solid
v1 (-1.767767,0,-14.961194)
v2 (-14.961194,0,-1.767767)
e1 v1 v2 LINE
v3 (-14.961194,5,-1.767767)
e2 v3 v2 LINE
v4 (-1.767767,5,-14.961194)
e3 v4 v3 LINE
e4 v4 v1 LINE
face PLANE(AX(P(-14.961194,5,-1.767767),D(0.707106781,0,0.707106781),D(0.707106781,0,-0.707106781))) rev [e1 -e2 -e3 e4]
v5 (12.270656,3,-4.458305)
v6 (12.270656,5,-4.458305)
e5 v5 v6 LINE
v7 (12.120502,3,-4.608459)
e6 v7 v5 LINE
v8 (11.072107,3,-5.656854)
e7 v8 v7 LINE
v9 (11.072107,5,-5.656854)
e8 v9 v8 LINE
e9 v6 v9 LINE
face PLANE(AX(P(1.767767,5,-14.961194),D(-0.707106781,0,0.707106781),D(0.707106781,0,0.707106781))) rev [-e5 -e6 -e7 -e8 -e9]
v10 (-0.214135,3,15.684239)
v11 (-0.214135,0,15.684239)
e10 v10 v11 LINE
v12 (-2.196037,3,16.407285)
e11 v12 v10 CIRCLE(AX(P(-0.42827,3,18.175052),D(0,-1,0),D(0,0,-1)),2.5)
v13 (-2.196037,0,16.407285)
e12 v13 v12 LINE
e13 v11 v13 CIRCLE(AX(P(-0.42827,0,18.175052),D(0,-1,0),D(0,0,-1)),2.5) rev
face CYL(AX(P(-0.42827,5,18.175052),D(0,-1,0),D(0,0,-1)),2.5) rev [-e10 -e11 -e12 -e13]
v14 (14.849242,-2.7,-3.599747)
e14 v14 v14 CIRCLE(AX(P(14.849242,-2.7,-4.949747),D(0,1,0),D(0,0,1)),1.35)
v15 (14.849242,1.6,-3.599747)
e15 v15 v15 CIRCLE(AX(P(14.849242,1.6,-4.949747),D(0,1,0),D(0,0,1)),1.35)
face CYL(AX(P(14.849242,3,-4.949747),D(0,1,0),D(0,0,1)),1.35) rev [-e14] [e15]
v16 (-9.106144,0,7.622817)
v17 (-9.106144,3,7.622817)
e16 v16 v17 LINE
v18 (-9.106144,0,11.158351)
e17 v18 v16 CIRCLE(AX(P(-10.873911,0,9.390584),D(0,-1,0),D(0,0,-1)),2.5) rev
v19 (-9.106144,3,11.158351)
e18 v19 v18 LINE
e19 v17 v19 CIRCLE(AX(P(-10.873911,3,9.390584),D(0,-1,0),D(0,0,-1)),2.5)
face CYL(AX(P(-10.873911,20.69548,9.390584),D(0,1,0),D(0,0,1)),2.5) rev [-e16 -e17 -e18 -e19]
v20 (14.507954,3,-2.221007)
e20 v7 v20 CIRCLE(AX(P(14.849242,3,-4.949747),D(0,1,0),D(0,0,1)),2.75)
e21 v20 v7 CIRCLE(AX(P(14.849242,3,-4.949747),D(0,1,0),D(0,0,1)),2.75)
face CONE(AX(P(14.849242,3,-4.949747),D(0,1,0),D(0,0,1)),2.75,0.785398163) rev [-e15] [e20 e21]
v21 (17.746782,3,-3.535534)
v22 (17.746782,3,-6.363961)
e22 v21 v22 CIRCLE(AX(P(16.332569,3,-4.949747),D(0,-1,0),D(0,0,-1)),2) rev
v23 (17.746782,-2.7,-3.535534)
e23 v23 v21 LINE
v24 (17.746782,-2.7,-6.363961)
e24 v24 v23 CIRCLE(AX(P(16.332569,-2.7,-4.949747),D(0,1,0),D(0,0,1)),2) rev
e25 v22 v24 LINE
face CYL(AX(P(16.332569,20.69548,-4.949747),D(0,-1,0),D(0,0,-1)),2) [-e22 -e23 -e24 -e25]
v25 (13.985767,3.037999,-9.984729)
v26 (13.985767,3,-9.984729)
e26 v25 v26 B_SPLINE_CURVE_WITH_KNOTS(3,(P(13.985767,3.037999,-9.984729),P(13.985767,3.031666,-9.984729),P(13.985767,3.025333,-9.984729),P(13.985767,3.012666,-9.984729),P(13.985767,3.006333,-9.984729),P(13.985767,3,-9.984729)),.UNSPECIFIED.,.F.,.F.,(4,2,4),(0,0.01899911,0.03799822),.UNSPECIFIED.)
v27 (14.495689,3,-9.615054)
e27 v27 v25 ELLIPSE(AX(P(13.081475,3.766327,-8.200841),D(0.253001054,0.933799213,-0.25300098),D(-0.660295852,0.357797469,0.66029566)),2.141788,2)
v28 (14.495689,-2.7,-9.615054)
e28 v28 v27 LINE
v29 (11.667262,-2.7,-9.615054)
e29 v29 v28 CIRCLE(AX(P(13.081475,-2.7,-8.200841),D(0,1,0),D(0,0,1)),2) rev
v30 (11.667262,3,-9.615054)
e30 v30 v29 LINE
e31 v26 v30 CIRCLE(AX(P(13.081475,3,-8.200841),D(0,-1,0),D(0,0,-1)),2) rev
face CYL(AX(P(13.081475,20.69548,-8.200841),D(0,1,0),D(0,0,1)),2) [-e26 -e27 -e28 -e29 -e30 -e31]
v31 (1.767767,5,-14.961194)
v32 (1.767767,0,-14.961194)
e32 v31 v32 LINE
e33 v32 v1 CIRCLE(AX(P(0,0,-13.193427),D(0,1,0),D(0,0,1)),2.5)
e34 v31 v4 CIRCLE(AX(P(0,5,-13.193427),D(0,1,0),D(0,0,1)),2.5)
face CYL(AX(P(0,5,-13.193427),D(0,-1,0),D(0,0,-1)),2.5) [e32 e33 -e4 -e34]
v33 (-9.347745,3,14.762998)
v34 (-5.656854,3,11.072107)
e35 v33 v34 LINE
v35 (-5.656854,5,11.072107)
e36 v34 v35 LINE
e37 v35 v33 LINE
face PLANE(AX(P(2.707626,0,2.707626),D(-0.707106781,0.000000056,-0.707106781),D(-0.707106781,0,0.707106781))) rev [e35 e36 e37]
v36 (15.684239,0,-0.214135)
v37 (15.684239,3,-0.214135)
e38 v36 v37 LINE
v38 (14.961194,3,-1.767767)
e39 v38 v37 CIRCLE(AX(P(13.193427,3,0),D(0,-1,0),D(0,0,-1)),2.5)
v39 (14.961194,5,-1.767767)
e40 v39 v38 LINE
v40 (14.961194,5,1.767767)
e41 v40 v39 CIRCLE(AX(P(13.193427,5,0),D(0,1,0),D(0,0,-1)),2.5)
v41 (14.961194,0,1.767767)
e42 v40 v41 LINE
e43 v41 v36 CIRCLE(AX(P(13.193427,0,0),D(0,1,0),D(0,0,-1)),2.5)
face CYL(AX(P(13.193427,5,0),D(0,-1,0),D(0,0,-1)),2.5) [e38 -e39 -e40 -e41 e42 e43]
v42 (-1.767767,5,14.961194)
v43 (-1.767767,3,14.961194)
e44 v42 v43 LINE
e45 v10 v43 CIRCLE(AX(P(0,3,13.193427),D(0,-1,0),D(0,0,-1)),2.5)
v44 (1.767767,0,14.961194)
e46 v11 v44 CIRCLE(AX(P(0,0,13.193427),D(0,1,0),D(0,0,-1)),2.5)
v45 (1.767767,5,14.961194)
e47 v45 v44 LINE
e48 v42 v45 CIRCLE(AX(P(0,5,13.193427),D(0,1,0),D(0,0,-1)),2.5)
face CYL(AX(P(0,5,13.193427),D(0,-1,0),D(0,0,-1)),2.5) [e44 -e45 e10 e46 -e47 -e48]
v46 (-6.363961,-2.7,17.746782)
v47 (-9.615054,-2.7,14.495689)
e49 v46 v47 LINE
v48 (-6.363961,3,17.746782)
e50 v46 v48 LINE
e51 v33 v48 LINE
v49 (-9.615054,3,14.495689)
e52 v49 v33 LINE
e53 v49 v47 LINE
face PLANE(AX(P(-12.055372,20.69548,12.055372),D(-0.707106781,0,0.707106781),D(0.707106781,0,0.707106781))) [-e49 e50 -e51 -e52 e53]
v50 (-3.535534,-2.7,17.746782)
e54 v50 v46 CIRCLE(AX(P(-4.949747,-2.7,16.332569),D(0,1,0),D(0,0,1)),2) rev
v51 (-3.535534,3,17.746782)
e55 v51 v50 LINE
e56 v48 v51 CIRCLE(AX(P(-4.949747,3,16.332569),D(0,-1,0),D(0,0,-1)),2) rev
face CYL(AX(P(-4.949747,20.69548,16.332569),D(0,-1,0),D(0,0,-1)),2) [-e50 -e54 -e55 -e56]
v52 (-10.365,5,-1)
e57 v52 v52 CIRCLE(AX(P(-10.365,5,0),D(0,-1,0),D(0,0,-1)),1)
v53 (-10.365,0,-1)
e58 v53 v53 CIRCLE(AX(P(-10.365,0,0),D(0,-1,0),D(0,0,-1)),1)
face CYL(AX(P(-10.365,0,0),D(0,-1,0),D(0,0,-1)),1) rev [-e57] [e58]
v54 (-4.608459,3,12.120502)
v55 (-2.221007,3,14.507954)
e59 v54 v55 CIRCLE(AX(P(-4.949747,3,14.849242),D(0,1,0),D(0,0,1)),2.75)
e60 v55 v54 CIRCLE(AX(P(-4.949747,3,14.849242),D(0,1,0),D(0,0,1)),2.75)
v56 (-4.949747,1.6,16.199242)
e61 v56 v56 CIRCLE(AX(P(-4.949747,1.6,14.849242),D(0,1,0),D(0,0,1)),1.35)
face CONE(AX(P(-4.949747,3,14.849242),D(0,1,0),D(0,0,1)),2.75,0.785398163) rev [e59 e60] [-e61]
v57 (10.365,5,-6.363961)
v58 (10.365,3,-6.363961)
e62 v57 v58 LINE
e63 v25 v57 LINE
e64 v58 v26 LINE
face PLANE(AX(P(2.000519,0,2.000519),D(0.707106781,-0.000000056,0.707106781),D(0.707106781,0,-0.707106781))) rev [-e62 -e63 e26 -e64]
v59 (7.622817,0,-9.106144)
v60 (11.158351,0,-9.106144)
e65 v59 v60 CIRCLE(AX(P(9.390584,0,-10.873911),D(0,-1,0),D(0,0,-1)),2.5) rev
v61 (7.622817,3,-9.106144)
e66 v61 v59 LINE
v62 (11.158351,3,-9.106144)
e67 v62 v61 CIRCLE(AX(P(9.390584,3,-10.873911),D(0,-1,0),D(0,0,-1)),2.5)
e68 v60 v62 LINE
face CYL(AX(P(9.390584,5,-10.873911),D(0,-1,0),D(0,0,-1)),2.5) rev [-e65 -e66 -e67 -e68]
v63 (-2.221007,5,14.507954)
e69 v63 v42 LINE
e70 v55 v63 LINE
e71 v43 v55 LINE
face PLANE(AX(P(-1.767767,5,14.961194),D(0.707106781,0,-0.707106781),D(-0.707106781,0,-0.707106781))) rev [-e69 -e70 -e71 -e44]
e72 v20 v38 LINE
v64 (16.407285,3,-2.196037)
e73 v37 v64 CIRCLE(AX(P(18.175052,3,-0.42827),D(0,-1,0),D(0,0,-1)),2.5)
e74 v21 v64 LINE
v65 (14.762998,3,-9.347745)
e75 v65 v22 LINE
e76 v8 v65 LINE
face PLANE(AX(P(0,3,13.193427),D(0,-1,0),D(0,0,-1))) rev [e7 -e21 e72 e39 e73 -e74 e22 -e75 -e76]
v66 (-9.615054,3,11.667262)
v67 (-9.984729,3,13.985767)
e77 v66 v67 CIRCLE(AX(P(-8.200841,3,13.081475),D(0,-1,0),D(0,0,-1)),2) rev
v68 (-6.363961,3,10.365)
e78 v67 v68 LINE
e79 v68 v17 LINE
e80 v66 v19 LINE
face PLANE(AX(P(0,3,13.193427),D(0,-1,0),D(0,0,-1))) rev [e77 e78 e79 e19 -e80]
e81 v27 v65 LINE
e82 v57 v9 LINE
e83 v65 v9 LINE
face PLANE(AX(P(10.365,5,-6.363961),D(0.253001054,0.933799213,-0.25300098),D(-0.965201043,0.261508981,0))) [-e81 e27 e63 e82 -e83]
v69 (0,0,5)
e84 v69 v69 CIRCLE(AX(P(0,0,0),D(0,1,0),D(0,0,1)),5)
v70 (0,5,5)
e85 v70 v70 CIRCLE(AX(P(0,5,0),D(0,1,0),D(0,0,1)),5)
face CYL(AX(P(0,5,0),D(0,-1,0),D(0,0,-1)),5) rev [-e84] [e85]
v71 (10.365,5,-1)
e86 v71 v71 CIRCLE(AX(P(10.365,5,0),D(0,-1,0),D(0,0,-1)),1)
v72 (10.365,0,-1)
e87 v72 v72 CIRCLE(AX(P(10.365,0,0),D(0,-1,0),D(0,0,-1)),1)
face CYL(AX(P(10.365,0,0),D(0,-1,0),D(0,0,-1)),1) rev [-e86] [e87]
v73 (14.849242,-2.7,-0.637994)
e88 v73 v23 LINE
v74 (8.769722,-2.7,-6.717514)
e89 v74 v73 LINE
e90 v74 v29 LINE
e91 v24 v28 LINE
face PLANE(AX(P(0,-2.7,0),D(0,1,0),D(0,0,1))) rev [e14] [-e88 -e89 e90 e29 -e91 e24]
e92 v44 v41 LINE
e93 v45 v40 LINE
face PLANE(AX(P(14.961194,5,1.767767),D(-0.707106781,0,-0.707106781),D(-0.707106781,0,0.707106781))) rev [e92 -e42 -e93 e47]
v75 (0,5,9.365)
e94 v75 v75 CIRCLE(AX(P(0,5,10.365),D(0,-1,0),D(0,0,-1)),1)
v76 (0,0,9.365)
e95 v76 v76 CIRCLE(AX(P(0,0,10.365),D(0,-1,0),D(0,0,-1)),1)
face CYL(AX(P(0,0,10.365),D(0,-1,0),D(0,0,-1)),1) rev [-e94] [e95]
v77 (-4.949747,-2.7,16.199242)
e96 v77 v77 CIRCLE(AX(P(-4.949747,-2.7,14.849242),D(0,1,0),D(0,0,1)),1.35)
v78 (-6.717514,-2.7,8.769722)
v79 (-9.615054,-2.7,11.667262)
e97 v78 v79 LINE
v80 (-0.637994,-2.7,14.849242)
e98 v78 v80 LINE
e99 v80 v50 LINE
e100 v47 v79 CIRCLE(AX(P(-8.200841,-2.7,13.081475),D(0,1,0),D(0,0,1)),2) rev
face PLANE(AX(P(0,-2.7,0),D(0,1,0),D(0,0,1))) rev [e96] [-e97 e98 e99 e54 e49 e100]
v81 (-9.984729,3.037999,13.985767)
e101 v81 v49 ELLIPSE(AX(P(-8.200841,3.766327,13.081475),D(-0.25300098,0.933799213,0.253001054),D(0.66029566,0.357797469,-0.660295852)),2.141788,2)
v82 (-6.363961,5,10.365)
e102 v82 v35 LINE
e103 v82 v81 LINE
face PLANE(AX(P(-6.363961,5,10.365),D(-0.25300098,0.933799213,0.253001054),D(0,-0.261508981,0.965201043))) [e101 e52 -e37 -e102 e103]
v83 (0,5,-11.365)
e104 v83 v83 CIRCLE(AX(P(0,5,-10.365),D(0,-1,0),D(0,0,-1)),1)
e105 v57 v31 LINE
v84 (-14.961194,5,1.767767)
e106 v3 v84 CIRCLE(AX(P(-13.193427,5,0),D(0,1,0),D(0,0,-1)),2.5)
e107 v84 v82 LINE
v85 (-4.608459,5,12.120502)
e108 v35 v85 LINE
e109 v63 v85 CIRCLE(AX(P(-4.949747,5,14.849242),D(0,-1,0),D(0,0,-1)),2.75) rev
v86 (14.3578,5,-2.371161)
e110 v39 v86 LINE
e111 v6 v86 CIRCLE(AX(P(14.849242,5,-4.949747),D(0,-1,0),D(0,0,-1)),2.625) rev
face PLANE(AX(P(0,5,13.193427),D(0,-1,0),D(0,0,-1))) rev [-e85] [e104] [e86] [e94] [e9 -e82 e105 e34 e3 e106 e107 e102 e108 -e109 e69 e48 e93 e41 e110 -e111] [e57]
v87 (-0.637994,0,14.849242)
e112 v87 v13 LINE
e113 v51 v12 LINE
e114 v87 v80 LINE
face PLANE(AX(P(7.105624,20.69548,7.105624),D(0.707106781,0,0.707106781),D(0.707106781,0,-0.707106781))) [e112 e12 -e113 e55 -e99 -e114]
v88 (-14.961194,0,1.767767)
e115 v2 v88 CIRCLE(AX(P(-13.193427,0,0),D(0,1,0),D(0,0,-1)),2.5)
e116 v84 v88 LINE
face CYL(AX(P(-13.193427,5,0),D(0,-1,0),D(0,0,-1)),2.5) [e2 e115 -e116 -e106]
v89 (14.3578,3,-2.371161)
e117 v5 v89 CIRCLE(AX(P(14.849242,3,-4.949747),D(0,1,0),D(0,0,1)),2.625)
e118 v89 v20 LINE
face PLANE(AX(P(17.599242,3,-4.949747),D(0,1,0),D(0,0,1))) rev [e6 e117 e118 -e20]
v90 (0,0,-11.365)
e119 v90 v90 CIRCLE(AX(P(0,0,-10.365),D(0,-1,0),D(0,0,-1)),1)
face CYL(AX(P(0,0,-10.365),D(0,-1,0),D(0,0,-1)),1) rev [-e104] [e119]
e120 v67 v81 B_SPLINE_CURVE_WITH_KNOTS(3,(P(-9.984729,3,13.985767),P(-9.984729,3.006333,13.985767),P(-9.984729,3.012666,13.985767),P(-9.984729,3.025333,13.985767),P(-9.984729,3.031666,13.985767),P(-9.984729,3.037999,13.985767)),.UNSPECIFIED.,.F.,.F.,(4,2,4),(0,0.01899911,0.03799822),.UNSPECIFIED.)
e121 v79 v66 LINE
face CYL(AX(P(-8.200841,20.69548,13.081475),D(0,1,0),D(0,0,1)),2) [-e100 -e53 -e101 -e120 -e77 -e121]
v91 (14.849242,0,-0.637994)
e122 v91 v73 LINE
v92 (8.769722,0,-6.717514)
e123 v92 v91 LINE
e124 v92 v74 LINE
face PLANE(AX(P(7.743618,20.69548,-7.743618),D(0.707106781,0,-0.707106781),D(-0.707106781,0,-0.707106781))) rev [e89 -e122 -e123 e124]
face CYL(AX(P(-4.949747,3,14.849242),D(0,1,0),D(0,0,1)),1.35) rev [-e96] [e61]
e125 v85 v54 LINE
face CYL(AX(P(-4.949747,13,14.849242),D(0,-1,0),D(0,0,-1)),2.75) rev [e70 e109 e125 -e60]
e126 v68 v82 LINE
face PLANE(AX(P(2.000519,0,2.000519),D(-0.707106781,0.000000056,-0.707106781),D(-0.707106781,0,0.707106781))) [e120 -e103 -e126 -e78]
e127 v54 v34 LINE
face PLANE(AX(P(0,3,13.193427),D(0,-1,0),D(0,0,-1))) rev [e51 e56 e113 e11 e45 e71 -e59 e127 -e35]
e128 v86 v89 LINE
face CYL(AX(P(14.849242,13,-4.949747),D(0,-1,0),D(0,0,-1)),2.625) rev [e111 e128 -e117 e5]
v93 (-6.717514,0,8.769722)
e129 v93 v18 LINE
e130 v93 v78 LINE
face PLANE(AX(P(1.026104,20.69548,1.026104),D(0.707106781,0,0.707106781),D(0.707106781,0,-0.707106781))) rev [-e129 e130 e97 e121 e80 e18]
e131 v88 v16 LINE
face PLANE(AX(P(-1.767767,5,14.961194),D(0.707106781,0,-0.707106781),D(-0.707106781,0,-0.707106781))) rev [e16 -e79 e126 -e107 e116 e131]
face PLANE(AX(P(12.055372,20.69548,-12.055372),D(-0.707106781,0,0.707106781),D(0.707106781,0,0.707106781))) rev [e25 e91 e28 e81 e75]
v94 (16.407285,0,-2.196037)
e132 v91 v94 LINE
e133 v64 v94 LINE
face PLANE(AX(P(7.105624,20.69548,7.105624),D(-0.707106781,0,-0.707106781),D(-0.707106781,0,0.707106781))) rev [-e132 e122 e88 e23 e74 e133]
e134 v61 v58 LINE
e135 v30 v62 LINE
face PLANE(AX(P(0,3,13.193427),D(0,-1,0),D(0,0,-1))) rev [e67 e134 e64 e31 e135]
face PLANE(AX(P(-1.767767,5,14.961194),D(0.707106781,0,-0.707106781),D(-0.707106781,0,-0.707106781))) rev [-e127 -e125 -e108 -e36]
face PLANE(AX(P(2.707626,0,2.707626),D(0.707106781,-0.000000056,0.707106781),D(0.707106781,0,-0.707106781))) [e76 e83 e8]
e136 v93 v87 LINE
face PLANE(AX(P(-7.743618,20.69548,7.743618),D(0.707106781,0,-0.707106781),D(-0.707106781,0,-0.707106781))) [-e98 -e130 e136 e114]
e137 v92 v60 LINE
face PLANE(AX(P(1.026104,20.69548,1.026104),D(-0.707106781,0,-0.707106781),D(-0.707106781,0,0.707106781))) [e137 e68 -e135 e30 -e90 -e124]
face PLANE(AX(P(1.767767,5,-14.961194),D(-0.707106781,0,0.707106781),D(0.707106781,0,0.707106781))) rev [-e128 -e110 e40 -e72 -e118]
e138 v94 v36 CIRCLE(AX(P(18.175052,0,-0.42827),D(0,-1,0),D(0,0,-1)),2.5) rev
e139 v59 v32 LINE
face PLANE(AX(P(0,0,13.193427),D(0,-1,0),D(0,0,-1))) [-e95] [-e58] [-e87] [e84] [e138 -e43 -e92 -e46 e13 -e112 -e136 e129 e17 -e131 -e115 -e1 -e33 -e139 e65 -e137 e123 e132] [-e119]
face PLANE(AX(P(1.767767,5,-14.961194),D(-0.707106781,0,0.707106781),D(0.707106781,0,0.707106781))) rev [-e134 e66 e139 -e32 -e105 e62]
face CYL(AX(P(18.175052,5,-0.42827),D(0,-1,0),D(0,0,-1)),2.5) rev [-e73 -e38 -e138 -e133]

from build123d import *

# Parameters (mm, degrees)
SKETCH1_R                                      = 0.5
SKETCH1_R_2                                    = 5
BOSS_EXTRUDE1_DEPTH                            = 5
SKETCH3_R                                      = 1.3
BOSS_EXTRUDE4_DEPTH                            = 5.7
BOSS_EXTRUDE6_DEPTH                            = 1
FILLET1_R                                      = 2.5
FILLET2_R                                      = 2
F_2_0MM_DOWEL_HOLE1_D                          = 2
F_2_0MM_DOWEL_HOLE1_DEPTH                      = 42.93
F_2_0MM_DOWEL_HOLE1_TIP                        = 0.600860619
SKETCH12_R                                     = 2.75
SKETCH12_R_2                                   = 2.625
CUT_EXTRUDE1_DEPTH                             = 10
CSK_FOR_M2_5_FLAT_HEAD_MACHINE_SCREW1_AT_COUNT = 2
CSK_FOR_M2_5_FLAT_HEAD_MACHINE_SCREW1_AT_PITCH = 28


with BuildPart() as part:
    # Sketch1 → Boss-Extrude1 (new body)
    with BuildSketch(Plane(origin=(0, 0, 0), x_dir=(1, 0, 0), z_dir=(0, 1, 0))):
        with BuildLine():
            Line((1.767766953, 14.961194078), (14.961194078, 1.767766953))
            ThreePointArc((14.961194078, 1.767766953), (15.693427125, 0), (14.961194078, -1.767766953))
            Line((14.961194078, -1.767766953), (1.767766953, -14.961194078))
            ThreePointArc((1.767766953, -14.961194078), (0, -15.693427125), (-1.767766953, -14.961194078))
            Line((-1.767766953, -14.961194078), (-14.961194078, -1.767766953))
            ThreePointArc((-14.961194078, -1.767766953), (-15.693427125, 0), (-14.961194078, 1.767766953))
            Line((-14.961194078, 1.767766953), (-1.767766953, 14.961194078))
            ThreePointArc((-1.767766953, 14.961194078), (0, 15.693427125), (1.767766953, 14.961194078))
        make_face()
        with Locations(Location((0, 10.365, 0), (0, 0, 270))):
            Circle(SKETCH1_R, mode=Mode.SUBTRACT)
        with Locations(Location((0, -10.365, 0), (0, 0, 270))):
            Circle(SKETCH1_R, mode=Mode.SUBTRACT)
        with Locations(Location((10.365, 0, 0), (0, 0, 270))):
            Circle(SKETCH1_R, mode=Mode.SUBTRACT)
        with Locations(Location((-10.365, 0, 0), (0, 0, 270))):
            Circle(SKETCH1_R, mode=Mode.SUBTRACT)
        with Locations(Location((0, 0, 0), (0, 0, 270))):
            Circle(SKETCH1_R_2, mode=Mode.SUBTRACT)
    extrude(amount=BOSS_EXTRUDE1_DEPTH)

    # Sketch3 → Boss-Extrude4 (add)
    # profile 1 of 4: a face of its own
    with BuildSketch(Plane(origin=(0, -2.7, 0), x_dir=(1, 0, 0), z_dir=(0, 1, 0))):
        Polygon((-4.949747468, -10.537489101), (-0.637994164, -14.849242405), (-4.949747468, -19.160995709), (-9.261500772, -14.849242405), align=None)
        with Locations(Location((-4.949747468, -14.849242405, 0), (0, 0, 90))):
            Circle(SKETCH3_R, mode=Mode.SUBTRACT)
    # profile 2 of 4: a face of its own
    with BuildSketch(Plane(origin=(0, -2.7, 0), x_dir=(1, 0, 0), z_dir=(0, 1, 0))):
        Polygon((-6.717514421, -8.769722148), (-11.029267725, -13.081475452), (-9.261500772, -14.849242405), (-4.949747468, -10.537489101), align=None)
    # profile 3 of 4: a face of its own
    with BuildSketch(Plane(origin=(0, -2.7, 0), x_dir=(1, 0, 0), z_dir=(0, 1, 0))):
        Polygon((19.160995709, 4.949747468), (14.849242405, 9.261500772), (10.537489101, 4.949747468), (14.849242405, 0.637994164), align=None)
        with Locations(Location((14.849242405, 4.949747468, 0), (0, 0, 90))):
            Circle(SKETCH3_R, mode=Mode.SUBTRACT)
    # profile 4 of 4: a face of its own
    with BuildSketch(Plane(origin=(0, -2.7, 0), x_dir=(1, 0, 0), z_dir=(0, 1, 0))):
        Polygon((13.081475452, 11.029267725), (14.849242405, 9.261500772), (10.537489101, 4.949747468), (8.769722148, 6.717514421), align=None)
    extrude(amount=BOSS_EXTRUDE4_DEPTH)


with BuildPart() as boss_extrude6_tool:
    # Sketch7 → Boss-Extrude6 (new body)
    with BuildSketch(Plane(origin=(2.707626069, -2.13e-07, 2.707626069), x_dir=(0.7071067811865474, 0, -0.7071067811865478), z_dir=(0.7071067811865467, -5.5755039757469385e-08, 0.7071067811865462))):
        Polygon((11.829161787, 5.00000052), (17.04887, 3.00000056), (11.829161787, 3.00000052), align=None)
        Polygon((-11.829161787, 5.00000052), (-17.04887, 3.00000056), (-11.829161787, 3.00000052), align=None)
    extrude(amount=-BOSS_EXTRUDE6_DEPTH)


with BuildPart() as part_1:
    add(part.part)


with BuildPart() as part_2:
    # Boss-Extrude6: joined with boss_extrude6_tool
    add(part_1.part.fuse(boss_extrude6_tool.part, tol=0.00001))

    # Fillet1
    fillet1_edges = [part_2.edges().sort_by_distance(p)[0] for p in [
        (-7.338376652, 1.5, 9.390584379),
        (-1.184018869, 1.5, 15.395267109),
        (9.390584379, 1.5, -7.338376652),
        (15.395267109, 1.5, -1.184018869),
    ]]
    fillet(fillet1_edges, radius=FILLET1_R)

    # Fillet2
    # the kernel refuses this fillet: 2 mm, written as the material it takes off along each edge
    with BuildSketch(Plane(origin=(-4.949747468, -7.7, 19.160995709), x_dir=(-0.7071067811865471, 0, -0.707106781186548), z_dir=(0, 1, 0)), Plane(origin=(13.081475452, -7.7, -11.029267725), x_dir=(0.7071067811865476, 0, 0.7071067811865476), z_dir=(0, 1, 0))) as fillet2_piece_1:
        with BuildLine():
            CenterArc((FILLET2_R, -FILLET2_R), FILLET2_R, 90, 90)
            Line((0, -FILLET2_R), (0, 0))
            Line((0, 0), (FILLET2_R, 0))
        make_face()
    extrude(amount=15.7, mode=Mode.SUBTRACT)
    with BuildSketch(Plane(origin=(-11.029267725, -7.7, 13.081475452), x_dir=(0.707106781186547, 0, 0.7071067811865479), z_dir=(0, 1, 0)), Plane(origin=(19.160995709, -7.7, -4.949747468), x_dir=(-0.7071067811865482, 0, -0.7071067811865469), z_dir=(0, 1, 0))) as fillet2_piece_2:
        with BuildLine():
            CenterArc((FILLET2_R, FILLET2_R), FILLET2_R, 180, 90)
            Line((0, FILLET2_R), (0, 0))
            Line((0, 0), (FILLET2_R, 0))
        make_face()
    extrude(amount=15.7, mode=Mode.SUBTRACT)

    # Ø2.0mm Dowel Hole1
    with Locations(Plane.XZ):
        with Locations((0, 10.365), (10.365, 0), (-10.365, 0), (0, -10.365)):
            Hole(F_2_0MM_DOWEL_HOLE1_D / 2, depth=F_2_0MM_DOWEL_HOLE1_DEPTH)
            with Locations((0, 0, -(F_2_0MM_DOWEL_HOLE1_DEPTH + F_2_0MM_DOWEL_HOLE1_TIP / 2))):  # 118° drill point
                Cone(0, F_2_0MM_DOWEL_HOLE1_D / 2, F_2_0MM_DOWEL_HOLE1_TIP, mode=Mode.SUBTRACT)

    # Sketch12 → Cut-Extrude1 (cut)
    with BuildSketch(Plane(origin=(0, 3, 0), x_dir=(1, 0, 0), z_dir=(0, 1, 0))):
        with Locations((-4.949747468, -14.849242405)):
            Circle(SKETCH12_R)
        with Locations((14.849242405, 4.949747468)):
            Circle(SKETCH12_R_2)
    extrude(amount=CUT_EXTRUDE1_DEPTH, mode=Mode.SUBTRACT)

    # Sketch13 → CSK for M2.5 Flat Head Machine Screw1 (revolve, cut)
    with BuildSketch(Plane(origin=(-4.949747468, 3, 14.849242405), x_dir=(0, 0, 1), z_dir=(1, 0, 0))):
        Polygon((0, 0), (0, 43.741161836), (1.35, 42.93), (1.35, 1.4), (2.75, 0), align=None)
    csk_for_m2_5_flat_head_machine_screw1 = revolve(axis=Axis((-4.949747468, 9.35, 14.849242405), (0, -1, 0)), mode=Mode.SUBTRACT)

    # CSK for M2.5 Flat Head Machine Screw1 at: CSK for M2.5 Flat Head Machine Screw1 ×2
    with Locations(*[Vector(0.7071067811865477, 0, -0.7071067811865475) * (i * CSK_FOR_M2_5_FLAT_HEAD_MACHINE_SCREW1_AT_PITCH) for i in range(1, CSK_FOR_M2_5_FLAT_HEAD_MACHINE_SCREW1_AT_COUNT)]):
        add(csk_for_m2_5_flat_head_machine_screw1, mode=Mode.SUBTRACT)


solid = part_2.part
